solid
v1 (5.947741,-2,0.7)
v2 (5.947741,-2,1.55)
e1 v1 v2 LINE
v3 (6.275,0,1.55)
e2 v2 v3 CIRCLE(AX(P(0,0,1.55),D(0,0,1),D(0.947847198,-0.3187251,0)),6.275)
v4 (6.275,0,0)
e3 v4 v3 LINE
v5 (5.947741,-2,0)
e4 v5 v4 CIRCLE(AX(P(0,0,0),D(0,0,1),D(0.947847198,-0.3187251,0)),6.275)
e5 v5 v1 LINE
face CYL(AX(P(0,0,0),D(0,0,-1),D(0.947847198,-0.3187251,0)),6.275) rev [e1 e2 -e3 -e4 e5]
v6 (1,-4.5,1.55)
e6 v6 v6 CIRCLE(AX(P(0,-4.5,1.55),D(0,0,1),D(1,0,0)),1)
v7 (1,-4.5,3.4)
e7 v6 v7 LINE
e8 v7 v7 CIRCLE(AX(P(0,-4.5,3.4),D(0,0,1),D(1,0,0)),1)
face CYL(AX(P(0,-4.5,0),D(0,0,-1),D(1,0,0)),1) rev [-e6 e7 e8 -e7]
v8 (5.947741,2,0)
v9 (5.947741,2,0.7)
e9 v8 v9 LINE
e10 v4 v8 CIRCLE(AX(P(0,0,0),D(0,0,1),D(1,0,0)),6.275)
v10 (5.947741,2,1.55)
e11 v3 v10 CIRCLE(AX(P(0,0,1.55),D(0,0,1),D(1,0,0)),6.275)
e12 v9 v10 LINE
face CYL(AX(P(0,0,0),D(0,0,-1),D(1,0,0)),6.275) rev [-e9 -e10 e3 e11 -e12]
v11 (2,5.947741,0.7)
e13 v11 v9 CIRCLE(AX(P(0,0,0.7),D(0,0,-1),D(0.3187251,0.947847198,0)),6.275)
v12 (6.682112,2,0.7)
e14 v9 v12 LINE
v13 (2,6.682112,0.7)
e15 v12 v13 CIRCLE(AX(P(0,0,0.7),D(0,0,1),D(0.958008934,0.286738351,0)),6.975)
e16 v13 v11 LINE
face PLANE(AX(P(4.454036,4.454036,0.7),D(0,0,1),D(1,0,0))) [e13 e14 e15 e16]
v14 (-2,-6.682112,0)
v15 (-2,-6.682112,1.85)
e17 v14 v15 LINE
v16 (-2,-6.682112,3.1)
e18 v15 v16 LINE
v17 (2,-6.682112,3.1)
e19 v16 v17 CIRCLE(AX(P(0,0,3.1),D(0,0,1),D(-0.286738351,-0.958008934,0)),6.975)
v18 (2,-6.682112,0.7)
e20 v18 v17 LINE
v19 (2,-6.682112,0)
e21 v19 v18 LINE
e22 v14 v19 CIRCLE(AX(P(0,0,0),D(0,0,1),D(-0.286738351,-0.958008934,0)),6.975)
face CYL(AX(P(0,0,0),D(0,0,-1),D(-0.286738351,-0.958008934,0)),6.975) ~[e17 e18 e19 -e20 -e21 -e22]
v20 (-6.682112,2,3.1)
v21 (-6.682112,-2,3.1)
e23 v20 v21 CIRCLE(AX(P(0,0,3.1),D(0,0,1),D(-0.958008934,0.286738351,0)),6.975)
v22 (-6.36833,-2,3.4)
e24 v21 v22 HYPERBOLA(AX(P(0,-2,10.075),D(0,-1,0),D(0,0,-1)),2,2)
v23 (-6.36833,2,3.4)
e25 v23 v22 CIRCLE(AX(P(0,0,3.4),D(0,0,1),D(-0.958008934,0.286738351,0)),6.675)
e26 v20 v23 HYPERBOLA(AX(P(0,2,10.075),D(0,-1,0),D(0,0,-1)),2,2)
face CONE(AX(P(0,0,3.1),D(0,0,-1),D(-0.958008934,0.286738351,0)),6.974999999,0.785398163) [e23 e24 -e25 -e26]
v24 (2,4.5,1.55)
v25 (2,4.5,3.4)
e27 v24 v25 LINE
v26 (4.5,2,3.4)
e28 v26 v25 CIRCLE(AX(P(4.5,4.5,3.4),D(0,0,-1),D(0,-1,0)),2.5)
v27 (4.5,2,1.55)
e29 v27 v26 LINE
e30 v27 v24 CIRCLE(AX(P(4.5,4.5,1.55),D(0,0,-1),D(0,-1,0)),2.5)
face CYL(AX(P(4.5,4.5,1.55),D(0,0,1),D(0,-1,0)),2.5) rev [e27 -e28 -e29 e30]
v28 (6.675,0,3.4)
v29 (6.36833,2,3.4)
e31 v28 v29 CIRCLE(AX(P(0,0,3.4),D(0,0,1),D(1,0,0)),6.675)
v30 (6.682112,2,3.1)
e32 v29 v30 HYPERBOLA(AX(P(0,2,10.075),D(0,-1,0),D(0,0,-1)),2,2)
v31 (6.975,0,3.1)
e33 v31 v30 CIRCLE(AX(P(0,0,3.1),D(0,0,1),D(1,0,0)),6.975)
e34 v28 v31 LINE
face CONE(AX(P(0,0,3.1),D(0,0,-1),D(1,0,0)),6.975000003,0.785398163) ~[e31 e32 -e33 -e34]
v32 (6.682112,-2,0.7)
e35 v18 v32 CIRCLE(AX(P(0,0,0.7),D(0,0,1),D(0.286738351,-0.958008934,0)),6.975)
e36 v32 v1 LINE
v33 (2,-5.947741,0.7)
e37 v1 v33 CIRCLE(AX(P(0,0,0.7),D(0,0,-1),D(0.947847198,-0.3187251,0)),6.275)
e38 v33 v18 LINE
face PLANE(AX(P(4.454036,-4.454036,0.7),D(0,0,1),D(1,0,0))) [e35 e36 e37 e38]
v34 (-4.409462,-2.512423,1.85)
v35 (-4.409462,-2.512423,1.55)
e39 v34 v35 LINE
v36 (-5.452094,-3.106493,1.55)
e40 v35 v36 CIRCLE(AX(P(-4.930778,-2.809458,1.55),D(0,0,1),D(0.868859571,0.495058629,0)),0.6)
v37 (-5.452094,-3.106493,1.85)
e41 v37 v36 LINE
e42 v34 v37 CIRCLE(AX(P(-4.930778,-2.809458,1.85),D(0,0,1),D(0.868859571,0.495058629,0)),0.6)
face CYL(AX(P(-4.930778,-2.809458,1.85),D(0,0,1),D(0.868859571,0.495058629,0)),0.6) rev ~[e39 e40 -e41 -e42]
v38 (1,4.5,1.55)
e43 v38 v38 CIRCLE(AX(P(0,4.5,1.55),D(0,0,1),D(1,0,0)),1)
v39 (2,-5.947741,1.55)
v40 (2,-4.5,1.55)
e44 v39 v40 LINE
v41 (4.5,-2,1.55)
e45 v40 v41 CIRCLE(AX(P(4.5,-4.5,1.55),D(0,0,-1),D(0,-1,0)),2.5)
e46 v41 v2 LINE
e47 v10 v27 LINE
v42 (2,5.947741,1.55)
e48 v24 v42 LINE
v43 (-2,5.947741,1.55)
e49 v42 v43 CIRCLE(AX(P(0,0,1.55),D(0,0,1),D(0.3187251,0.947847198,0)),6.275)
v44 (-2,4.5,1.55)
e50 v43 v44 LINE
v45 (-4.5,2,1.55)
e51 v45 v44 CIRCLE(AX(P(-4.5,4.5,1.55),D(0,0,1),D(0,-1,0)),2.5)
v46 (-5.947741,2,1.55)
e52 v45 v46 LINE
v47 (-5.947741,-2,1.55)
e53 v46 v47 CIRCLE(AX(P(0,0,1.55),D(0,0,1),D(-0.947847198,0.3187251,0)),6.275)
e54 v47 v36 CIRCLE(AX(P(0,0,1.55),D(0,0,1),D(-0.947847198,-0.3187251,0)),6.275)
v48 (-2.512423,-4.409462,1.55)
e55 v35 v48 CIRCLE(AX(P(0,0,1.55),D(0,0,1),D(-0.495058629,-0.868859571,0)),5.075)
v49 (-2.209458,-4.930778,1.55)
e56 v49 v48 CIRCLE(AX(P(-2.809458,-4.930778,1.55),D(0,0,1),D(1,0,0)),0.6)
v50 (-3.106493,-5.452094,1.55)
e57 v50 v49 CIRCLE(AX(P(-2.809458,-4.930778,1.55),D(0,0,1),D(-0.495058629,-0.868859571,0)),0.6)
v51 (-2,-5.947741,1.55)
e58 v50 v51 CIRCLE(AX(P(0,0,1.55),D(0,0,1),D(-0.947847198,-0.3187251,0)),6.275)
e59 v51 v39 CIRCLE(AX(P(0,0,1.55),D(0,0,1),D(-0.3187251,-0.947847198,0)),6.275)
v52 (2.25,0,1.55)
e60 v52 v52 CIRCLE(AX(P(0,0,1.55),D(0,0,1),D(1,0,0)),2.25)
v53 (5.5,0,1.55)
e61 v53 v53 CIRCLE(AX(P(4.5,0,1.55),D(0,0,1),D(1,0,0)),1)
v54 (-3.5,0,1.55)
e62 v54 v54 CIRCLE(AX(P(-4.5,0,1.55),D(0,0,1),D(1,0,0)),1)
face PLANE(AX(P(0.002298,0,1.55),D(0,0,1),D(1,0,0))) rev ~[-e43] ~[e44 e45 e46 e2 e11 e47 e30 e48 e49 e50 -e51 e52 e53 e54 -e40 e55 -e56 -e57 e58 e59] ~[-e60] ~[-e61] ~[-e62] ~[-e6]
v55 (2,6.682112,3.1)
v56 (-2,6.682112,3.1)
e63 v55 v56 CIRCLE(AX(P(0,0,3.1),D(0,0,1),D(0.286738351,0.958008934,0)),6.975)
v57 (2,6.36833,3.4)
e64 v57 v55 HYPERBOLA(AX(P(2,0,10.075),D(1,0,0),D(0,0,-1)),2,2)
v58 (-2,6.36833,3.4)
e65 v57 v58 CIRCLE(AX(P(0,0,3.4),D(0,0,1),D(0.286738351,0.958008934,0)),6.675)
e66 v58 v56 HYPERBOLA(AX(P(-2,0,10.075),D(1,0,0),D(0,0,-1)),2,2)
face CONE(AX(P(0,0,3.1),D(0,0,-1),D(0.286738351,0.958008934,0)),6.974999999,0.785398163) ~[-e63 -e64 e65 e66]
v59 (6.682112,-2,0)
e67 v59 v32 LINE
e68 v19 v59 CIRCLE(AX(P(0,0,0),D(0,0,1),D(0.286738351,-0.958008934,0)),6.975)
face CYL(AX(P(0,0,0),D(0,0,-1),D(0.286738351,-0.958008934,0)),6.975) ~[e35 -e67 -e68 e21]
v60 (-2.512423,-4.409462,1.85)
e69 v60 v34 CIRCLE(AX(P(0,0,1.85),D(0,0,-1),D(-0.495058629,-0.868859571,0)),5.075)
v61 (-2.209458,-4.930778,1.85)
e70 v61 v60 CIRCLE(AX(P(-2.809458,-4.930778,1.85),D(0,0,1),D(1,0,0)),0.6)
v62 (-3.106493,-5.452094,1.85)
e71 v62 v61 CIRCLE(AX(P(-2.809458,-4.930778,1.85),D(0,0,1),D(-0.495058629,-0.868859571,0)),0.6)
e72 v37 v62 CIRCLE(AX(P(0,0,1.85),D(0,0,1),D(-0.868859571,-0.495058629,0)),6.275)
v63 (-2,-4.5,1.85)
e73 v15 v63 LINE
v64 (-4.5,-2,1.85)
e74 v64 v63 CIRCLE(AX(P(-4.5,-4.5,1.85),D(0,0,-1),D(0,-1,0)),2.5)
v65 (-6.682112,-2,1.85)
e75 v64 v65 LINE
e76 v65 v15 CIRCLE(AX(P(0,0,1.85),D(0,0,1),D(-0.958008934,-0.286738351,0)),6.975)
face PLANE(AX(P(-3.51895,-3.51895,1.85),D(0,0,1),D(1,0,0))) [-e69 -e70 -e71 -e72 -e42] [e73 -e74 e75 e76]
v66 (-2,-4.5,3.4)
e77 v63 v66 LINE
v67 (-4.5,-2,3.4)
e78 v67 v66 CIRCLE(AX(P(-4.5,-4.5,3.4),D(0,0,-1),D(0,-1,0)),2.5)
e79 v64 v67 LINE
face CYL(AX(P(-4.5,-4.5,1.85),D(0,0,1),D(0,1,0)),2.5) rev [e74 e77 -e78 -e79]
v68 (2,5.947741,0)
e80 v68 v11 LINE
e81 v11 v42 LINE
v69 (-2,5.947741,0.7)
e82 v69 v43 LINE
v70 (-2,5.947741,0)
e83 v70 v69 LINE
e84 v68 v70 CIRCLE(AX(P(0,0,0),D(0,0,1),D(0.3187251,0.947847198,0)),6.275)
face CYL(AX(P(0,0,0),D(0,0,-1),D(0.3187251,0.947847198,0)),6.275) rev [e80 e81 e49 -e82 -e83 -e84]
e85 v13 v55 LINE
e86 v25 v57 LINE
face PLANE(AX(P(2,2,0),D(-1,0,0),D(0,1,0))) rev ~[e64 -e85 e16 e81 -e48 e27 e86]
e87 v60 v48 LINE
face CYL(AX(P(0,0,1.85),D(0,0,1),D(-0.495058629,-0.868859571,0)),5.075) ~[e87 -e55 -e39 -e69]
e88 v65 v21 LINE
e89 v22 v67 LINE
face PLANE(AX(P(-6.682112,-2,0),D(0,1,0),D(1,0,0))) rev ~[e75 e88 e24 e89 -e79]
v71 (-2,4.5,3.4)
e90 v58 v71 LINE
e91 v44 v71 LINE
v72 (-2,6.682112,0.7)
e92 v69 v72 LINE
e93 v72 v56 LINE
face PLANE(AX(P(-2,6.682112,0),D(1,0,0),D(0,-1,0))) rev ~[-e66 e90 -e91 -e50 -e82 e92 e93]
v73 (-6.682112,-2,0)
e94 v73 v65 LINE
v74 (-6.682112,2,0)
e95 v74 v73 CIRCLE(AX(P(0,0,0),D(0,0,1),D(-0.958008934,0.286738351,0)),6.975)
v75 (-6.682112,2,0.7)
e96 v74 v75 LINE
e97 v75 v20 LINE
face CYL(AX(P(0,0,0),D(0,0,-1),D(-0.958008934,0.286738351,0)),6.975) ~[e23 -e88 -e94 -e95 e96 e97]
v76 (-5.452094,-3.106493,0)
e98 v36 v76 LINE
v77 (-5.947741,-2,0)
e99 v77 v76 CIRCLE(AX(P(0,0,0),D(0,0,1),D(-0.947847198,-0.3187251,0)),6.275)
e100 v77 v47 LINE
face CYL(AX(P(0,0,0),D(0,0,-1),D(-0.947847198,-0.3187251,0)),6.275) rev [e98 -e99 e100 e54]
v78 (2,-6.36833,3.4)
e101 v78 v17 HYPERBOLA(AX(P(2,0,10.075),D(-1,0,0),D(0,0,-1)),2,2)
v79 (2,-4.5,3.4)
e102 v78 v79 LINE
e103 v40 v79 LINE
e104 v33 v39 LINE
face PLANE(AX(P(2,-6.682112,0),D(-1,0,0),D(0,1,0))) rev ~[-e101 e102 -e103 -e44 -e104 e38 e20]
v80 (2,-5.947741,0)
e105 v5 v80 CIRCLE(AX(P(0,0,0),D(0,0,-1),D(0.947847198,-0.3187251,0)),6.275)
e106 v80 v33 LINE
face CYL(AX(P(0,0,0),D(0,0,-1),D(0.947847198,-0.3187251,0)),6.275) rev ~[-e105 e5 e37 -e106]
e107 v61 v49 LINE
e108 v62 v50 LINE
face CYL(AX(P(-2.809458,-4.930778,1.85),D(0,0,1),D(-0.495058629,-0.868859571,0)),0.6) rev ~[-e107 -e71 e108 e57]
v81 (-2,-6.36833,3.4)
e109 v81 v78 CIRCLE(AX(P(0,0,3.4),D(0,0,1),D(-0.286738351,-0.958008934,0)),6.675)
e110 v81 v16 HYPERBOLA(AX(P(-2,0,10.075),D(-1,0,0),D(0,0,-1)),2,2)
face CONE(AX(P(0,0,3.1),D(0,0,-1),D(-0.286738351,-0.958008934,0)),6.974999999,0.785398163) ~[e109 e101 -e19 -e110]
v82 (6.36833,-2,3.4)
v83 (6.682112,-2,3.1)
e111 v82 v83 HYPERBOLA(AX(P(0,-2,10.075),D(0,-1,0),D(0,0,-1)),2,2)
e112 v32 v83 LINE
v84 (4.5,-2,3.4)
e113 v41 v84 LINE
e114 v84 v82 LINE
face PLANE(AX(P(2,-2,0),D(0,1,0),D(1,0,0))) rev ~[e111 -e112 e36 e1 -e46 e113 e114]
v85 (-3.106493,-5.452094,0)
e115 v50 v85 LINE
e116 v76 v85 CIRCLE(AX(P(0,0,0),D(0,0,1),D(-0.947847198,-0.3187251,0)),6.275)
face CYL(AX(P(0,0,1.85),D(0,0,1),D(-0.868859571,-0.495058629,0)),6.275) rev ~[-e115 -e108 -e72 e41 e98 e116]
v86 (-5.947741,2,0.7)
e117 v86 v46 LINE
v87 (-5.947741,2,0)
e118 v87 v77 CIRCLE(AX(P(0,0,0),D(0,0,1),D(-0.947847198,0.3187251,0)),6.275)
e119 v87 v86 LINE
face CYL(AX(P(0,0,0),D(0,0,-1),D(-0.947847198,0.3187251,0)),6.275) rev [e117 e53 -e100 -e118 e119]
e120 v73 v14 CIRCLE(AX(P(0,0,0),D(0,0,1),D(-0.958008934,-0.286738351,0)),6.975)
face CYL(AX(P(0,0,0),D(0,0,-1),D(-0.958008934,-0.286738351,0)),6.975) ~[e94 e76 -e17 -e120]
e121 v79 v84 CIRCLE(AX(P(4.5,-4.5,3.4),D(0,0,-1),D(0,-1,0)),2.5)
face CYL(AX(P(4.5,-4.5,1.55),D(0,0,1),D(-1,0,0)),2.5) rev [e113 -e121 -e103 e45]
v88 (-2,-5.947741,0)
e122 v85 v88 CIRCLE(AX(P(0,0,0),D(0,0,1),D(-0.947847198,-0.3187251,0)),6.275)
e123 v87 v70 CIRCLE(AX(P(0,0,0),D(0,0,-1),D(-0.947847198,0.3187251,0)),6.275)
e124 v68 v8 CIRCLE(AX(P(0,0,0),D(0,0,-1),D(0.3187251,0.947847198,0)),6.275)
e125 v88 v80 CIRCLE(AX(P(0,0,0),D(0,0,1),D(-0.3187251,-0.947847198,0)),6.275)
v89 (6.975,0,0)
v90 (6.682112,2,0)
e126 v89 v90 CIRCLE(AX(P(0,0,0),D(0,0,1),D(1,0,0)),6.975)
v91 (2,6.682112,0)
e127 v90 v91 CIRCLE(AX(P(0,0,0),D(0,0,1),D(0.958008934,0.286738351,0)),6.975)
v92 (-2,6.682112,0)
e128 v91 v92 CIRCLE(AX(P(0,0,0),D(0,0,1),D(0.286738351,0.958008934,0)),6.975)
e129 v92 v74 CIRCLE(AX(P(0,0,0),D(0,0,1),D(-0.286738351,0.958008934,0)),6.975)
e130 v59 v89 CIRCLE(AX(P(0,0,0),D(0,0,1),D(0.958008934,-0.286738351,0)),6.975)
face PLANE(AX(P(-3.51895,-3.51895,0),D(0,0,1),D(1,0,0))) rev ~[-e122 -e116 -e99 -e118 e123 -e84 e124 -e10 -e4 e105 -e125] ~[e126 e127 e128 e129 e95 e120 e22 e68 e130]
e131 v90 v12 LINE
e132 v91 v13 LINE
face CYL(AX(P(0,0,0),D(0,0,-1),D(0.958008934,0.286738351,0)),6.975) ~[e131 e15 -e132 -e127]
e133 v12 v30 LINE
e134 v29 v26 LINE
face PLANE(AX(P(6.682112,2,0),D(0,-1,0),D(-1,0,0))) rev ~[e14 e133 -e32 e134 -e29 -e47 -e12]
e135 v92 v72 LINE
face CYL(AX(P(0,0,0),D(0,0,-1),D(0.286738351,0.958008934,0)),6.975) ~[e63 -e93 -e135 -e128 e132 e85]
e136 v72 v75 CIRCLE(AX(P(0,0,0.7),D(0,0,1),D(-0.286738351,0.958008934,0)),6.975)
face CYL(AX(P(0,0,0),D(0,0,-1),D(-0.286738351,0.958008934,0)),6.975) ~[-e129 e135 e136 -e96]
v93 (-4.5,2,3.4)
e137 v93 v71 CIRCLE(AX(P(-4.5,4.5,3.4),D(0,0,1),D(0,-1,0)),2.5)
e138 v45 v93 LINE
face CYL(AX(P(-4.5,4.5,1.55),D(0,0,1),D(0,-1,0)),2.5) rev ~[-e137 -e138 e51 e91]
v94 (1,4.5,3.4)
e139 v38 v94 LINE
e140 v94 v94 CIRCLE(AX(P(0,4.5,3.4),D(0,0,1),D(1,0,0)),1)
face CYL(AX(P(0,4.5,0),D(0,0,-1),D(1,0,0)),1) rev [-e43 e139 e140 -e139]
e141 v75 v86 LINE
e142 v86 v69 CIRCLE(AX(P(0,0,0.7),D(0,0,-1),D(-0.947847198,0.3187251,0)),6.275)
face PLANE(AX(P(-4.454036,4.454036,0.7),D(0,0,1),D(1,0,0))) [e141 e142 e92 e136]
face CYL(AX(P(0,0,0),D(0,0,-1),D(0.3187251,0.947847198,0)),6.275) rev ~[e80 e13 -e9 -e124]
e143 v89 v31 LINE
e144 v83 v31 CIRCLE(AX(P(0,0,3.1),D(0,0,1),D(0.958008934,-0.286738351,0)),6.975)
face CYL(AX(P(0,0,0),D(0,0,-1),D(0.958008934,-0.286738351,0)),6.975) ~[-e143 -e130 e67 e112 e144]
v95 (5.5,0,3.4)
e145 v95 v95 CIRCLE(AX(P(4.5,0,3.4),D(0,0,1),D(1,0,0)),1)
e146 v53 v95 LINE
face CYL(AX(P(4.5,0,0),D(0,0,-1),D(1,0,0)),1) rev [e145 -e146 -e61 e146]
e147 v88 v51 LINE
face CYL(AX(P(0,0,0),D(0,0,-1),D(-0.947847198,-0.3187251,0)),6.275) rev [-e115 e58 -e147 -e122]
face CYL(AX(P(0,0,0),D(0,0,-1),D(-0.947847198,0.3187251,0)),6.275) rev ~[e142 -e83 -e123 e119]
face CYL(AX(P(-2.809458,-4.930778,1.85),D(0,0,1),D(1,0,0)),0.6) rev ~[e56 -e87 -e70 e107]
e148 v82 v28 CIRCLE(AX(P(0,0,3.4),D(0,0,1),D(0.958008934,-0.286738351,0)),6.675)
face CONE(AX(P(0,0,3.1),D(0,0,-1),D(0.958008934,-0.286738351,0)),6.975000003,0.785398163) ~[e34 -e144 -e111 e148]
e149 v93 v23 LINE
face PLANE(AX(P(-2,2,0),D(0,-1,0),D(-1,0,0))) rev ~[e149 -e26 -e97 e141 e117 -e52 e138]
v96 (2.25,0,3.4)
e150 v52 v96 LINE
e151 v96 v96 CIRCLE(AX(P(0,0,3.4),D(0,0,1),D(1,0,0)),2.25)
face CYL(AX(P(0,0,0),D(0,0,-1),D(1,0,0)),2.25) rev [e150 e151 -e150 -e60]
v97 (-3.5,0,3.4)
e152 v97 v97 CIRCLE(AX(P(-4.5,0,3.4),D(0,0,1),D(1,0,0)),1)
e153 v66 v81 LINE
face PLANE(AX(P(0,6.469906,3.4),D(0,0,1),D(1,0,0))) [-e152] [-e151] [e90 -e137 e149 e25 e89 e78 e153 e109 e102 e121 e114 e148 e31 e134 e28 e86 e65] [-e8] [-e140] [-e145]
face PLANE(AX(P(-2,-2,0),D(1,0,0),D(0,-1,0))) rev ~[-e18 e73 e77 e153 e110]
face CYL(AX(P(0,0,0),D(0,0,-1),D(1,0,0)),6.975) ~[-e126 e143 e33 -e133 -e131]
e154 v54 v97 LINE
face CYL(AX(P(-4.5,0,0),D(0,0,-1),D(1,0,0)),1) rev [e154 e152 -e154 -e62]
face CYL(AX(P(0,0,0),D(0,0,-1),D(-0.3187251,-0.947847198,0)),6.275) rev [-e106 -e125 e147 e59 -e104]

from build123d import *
from build123d import SkipClean  # not in build123d's __all__

# Parameters (mm, degrees)
F0_R     = 1
F0_R_2   = 2.25
F1_DEPTH = 3.4
F2_DEPTH = 0.7
F3_DEPTH = 1.85
F4_DEPTH = 1.55
F5_R     = 2.5
F6_SIZE  = 0.3
F8_DEPTH = 1.851


# Not quite as in the source:
# - after a boolean that leaves OpenCascade's solid faulty, fix() repairs it


with BuildPart() as f1:
    # F0 (on Top) → F1 (new body)
    with BuildSketch(Plane.XY):
        with BuildLine():
            Line((2, 5.9477411679), (2, 6.6821123157))
            ThreePointArc((2, 6.6821123157), (0, 6.975), (-2, 6.6821123157))
            Line((-2, 6.6821123157), (-2, 5.9477411679))
            ThreePointArc((-2, 5.9477411679), (0, 6.275), (2, 5.9477411679))
        make_face()
        with BuildLine():
            ThreePointArc((6.275, 0), (6.1926448642, 1.013298863), (5.9477411679, 2))
            Line((5.9477411679, 2), (2, 2))
            Line((2, 2), (2, 5.9477411679))
            ThreePointArc((2, 5.9477411679), (0, 6.275), (-2, 5.9477411679))
            Line((-2, 5.9477411679), (-2, 2))
            Line((-2, 2), (-5.9477411679, 2))
            ThreePointArc((-5.9477411679, 2), (-6.275, 0), (-5.9477411679, -2))
            Line((-5.9477411679, -2), (-2, -2))
            Line((-2, -2), (-2, -5.9477411679))
            ThreePointArc((-2, -5.9477411679), (0, -6.275), (2, -5.9477411679))
            Line((2, -5.9477411679), (2, -2))
            Line((2, -2), (5.9477411679, -2))
            ThreePointArc((5.9477411679, -2), (6.1926448642, -1.013298863), (6.275, 0))
        make_face()
        with Locations((0, -4.5)):
            Circle(F0_R, mode=Mode.SUBTRACT)
        with Locations((-4.5, 0)):
            Circle(F0_R, mode=Mode.SUBTRACT)
        Circle(F0_R_2, mode=Mode.SUBTRACT)
        with Locations((4.5, 0)):
            Circle(F0_R, mode=Mode.SUBTRACT)
        with Locations((0, 4.5)):
            Circle(F0_R, mode=Mode.SUBTRACT)
        with BuildLine():
            ThreePointArc((6.6821123157, -2), (6.9013896572, -1.0106660175), (6.975, 0))
            ThreePointArc((6.975, 0), (6.9013896572, 1.0106660175), (6.6821123157, 2))
            Line((6.6821123157, 2), (5.9477411679, 2))
            ThreePointArc((5.9477411679, 2), (6.1926448642, 1.013298863), (6.275, 0))
            ThreePointArc((6.275, 0), (6.1926448642, -1.013298863), (5.9477411679, -2))
            Line((5.9477411679, -2), (6.6821123157, -2))
        make_face()
        with BuildLine():
            Line((-5.9477411679, 2), (-6.6821123157, 2))
            ThreePointArc((-6.6821123157, 2), (-6.975, 0), (-6.6821123157, -2))
            Line((-6.6821123157, -2), (-5.9477411679, -2))
            ThreePointArc((-5.9477411679, -2), (-6.275, 0), (-5.9477411679, 2))
        make_face()
        with BuildLine():
            ThreePointArc((-2, -6.6821123157), (0, -6.975), (2, -6.6821123157))
            Line((2, -6.6821123157), (2, -5.9477411679))
            ThreePointArc((2, -5.9477411679), (0, -6.275), (-2, -5.9477411679))
            Line((-2, -5.9477411679), (-2, -6.6821123157))
        make_face()
    extrude(amount=F1_DEPTH)

    # F0 (on Top) → F2 (join)
    with BuildSketch(Plane.XY):
        with BuildLine():
            Line((-2, 5.9477411679), (-2, 6.6821123157))
            ThreePointArc((-2, 6.6821123157), (-4.9320697988, 4.9320697988), (-6.6821123157, 2))
            Line((-6.6821123157, 2), (-5.9477411679, 2))
            ThreePointArc((-5.9477411679, 2), (-4.4370950519, 4.4370950519), (-2, 5.9477411679))
        make_face()
        with BuildLine():
            Line((5.9477411679, 2), (6.6821123157, 2))
            ThreePointArc((6.6821123157, 2), (4.9320697988, 4.9320697988), (2, 6.6821123157))
            Line((2, 6.6821123157), (2, 5.9477411679))
            ThreePointArc((2, 5.9477411679), (4.4370950519, 4.4370950519), (5.9477411679, 2))
        make_face()
        with BuildLine():
            ThreePointArc((2, -6.6821123157), (4.9320697988, -4.9320697988), (6.6821123157, -2))
            Line((6.6821123157, -2), (5.9477411679, -2))
            ThreePointArc((5.9477411679, -2), (4.4370950519, -4.4370950519), (2, -5.9477411679))
            Line((2, -5.9477411679), (2, -6.6821123157))
        make_face()
    extrude(amount=F2_DEPTH)

    # F0 (on Top) → F3 (join, through all)
    with BuildSketch(Plane.XY):
        with BuildLine():
            ThreePointArc((-5.9477411679, -2), (-4.4370950519, -4.4370950519), (-2, -5.9477411679))
            Line((-2, -5.9477411679), (-2, -2))
            Line((-2, -2), (-5.9477411679, -2))
        make_face()
        with BuildLine():
            ThreePointArc((-6.6821123157, -2), (-4.9320697988, -4.9320697988), (-2, -6.6821123157))
            Line((-2, -6.6821123157), (-2, -5.9477411679))
            ThreePointArc((-2, -5.9477411679), (-4.4370950519, -4.4370950519), (-5.9477411679, -2))
            Line((-5.9477411679, -2), (-6.6821123157, -2))
        make_face()
    extrude(amount=F3_DEPTH)

    # F0 (on Top) → F4 (cut, through all)
    with BuildSketch(Plane.XY):
        with BuildLine():
            ThreePointArc((6.275, 0), (6.1926448642, 1.013298863), (5.9477411679, 2))
            Line((5.9477411679, 2), (2, 2))
            Line((2, 2), (2, 5.9477411679))
            ThreePointArc((2, 5.9477411679), (0, 6.275), (-2, 5.9477411679))
            Line((-2, 5.9477411679), (-2, 2))
            Line((-2, 2), (-5.9477411679, 2))
            ThreePointArc((-5.9477411679, 2), (-6.275, 0), (-5.9477411679, -2))
            Line((-5.9477411679, -2), (-2, -2))
            Line((-2, -2), (-2, -5.9477411679))
            ThreePointArc((-2, -5.9477411679), (0, -6.275), (2, -5.9477411679))
            Line((2, -5.9477411679), (2, -2))
            Line((2, -2), (5.9477411679, -2))
            ThreePointArc((5.9477411679, -2), (6.1926448642, -1.013298863), (6.275, 0))
        make_face()
        with Locations((0, -4.5)):
            Circle(F0_R, mode=Mode.SUBTRACT)
        with Locations((-4.5, 0)):
            Circle(F0_R, mode=Mode.SUBTRACT)
        Circle(F0_R_2, mode=Mode.SUBTRACT)
        with Locations((4.5, 0)):
            Circle(F0_R, mode=Mode.SUBTRACT)
        with Locations((0, 4.5)):
            Circle(F0_R, mode=Mode.SUBTRACT)
        with BuildLine():
            ThreePointArc((-5.9477411679, -2), (-4.4370950519, -4.4370950519), (-2, -5.9477411679))
            Line((-2, -5.9477411679), (-2, -2))
            Line((-2, -2), (-5.9477411679, -2))
        make_face()
    with SkipClean():  # cleaning this boolean's faces spoils the solid; the shape is the same uncleaned
        extrude(amount=F4_DEPTH, mode=Mode.SUBTRACT)

    # F5
    f5_edges = [f1.edges().sort_by_distance(p)[0] for p in [
        (-2, 2, 2.475),
        (-2, -2, 2.625),
        (2, -2, 2.475),
        (2, 2, 2.475),
    ]]
    fillet(f5_edges, radius=F5_R)

    # F6
    f6_edges = [f1.edges().sort_by_distance(p)[0] for p in [
        (0, -6.975, 3.4),
        (6.975, 0, 3.4),
        (0, 6.975, 3.4),
        (-6.975, 0, 3.4),
    ]]
    chamfer(f6_edges, length=F6_SIZE)

    # F7 (on face) → F8 (cut, through all)
    with BuildSketch(Plane.XY.offset(1.85)):
        with BuildLine():
            ThreePointArc((-5.4520938065, -3.106492898), (-4.777137974, -3.3894531711), (-4.330778064, -2.8094577205))
            ThreePointArc((-4.330778064, -2.8094577205), (-4.3507826134, -2.6558176305), (-4.4094623216, -2.512422543))
            ThreePointArc((-4.4094623216, -2.512422543), (-5.2278132415, -2.288141978), (-5.4520938065, -3.106492898))
        make_face()
        with BuildLine():
            ThreePointArc((-4.4094623216, -2.512422543), (-4.3507826134, -2.6558176305), (-4.330778064, -2.8094577205))
            ThreePointArc((-4.330778064, -2.8094577205), (-4.777137974, -3.3894531711), (-5.4520938065, -3.106492898))
            ThreePointArc((-5.4520938065, -3.106492898), (-4.4370950519, -4.4370950519), (-3.106492898, -5.4520938065))
            ThreePointArc((-3.106492898, -5.4520938065), (-3.3307734629, -4.6337428865), (-2.512422543, -4.4094623216))
            ThreePointArc((-2.512422543, -4.4094623216), (-3.5885669145, -3.5885669145), (-4.4094623216, -2.512422543))
        make_face()
        with BuildLine():
            ThreePointArc((-2.2094577205, -4.930778064), (-2.2906990548, -4.6292992974), (-2.512422543, -4.4094623216))
            ThreePointArc((-2.512422543, -4.4094623216), (-3.3307734629, -4.6337428865), (-3.106492898, -5.4520938065))
            ThreePointArc((-3.106492898, -5.4520938065), (-2.5079789538, -5.4495367298), (-2.2094577205, -4.930778064))
        make_face()
    extrude(amount=-F8_DEPTH, mode=Mode.SUBTRACT)

    add(f1.part.fix(), mode=Mode.REPLACE)


solid = f1.part
